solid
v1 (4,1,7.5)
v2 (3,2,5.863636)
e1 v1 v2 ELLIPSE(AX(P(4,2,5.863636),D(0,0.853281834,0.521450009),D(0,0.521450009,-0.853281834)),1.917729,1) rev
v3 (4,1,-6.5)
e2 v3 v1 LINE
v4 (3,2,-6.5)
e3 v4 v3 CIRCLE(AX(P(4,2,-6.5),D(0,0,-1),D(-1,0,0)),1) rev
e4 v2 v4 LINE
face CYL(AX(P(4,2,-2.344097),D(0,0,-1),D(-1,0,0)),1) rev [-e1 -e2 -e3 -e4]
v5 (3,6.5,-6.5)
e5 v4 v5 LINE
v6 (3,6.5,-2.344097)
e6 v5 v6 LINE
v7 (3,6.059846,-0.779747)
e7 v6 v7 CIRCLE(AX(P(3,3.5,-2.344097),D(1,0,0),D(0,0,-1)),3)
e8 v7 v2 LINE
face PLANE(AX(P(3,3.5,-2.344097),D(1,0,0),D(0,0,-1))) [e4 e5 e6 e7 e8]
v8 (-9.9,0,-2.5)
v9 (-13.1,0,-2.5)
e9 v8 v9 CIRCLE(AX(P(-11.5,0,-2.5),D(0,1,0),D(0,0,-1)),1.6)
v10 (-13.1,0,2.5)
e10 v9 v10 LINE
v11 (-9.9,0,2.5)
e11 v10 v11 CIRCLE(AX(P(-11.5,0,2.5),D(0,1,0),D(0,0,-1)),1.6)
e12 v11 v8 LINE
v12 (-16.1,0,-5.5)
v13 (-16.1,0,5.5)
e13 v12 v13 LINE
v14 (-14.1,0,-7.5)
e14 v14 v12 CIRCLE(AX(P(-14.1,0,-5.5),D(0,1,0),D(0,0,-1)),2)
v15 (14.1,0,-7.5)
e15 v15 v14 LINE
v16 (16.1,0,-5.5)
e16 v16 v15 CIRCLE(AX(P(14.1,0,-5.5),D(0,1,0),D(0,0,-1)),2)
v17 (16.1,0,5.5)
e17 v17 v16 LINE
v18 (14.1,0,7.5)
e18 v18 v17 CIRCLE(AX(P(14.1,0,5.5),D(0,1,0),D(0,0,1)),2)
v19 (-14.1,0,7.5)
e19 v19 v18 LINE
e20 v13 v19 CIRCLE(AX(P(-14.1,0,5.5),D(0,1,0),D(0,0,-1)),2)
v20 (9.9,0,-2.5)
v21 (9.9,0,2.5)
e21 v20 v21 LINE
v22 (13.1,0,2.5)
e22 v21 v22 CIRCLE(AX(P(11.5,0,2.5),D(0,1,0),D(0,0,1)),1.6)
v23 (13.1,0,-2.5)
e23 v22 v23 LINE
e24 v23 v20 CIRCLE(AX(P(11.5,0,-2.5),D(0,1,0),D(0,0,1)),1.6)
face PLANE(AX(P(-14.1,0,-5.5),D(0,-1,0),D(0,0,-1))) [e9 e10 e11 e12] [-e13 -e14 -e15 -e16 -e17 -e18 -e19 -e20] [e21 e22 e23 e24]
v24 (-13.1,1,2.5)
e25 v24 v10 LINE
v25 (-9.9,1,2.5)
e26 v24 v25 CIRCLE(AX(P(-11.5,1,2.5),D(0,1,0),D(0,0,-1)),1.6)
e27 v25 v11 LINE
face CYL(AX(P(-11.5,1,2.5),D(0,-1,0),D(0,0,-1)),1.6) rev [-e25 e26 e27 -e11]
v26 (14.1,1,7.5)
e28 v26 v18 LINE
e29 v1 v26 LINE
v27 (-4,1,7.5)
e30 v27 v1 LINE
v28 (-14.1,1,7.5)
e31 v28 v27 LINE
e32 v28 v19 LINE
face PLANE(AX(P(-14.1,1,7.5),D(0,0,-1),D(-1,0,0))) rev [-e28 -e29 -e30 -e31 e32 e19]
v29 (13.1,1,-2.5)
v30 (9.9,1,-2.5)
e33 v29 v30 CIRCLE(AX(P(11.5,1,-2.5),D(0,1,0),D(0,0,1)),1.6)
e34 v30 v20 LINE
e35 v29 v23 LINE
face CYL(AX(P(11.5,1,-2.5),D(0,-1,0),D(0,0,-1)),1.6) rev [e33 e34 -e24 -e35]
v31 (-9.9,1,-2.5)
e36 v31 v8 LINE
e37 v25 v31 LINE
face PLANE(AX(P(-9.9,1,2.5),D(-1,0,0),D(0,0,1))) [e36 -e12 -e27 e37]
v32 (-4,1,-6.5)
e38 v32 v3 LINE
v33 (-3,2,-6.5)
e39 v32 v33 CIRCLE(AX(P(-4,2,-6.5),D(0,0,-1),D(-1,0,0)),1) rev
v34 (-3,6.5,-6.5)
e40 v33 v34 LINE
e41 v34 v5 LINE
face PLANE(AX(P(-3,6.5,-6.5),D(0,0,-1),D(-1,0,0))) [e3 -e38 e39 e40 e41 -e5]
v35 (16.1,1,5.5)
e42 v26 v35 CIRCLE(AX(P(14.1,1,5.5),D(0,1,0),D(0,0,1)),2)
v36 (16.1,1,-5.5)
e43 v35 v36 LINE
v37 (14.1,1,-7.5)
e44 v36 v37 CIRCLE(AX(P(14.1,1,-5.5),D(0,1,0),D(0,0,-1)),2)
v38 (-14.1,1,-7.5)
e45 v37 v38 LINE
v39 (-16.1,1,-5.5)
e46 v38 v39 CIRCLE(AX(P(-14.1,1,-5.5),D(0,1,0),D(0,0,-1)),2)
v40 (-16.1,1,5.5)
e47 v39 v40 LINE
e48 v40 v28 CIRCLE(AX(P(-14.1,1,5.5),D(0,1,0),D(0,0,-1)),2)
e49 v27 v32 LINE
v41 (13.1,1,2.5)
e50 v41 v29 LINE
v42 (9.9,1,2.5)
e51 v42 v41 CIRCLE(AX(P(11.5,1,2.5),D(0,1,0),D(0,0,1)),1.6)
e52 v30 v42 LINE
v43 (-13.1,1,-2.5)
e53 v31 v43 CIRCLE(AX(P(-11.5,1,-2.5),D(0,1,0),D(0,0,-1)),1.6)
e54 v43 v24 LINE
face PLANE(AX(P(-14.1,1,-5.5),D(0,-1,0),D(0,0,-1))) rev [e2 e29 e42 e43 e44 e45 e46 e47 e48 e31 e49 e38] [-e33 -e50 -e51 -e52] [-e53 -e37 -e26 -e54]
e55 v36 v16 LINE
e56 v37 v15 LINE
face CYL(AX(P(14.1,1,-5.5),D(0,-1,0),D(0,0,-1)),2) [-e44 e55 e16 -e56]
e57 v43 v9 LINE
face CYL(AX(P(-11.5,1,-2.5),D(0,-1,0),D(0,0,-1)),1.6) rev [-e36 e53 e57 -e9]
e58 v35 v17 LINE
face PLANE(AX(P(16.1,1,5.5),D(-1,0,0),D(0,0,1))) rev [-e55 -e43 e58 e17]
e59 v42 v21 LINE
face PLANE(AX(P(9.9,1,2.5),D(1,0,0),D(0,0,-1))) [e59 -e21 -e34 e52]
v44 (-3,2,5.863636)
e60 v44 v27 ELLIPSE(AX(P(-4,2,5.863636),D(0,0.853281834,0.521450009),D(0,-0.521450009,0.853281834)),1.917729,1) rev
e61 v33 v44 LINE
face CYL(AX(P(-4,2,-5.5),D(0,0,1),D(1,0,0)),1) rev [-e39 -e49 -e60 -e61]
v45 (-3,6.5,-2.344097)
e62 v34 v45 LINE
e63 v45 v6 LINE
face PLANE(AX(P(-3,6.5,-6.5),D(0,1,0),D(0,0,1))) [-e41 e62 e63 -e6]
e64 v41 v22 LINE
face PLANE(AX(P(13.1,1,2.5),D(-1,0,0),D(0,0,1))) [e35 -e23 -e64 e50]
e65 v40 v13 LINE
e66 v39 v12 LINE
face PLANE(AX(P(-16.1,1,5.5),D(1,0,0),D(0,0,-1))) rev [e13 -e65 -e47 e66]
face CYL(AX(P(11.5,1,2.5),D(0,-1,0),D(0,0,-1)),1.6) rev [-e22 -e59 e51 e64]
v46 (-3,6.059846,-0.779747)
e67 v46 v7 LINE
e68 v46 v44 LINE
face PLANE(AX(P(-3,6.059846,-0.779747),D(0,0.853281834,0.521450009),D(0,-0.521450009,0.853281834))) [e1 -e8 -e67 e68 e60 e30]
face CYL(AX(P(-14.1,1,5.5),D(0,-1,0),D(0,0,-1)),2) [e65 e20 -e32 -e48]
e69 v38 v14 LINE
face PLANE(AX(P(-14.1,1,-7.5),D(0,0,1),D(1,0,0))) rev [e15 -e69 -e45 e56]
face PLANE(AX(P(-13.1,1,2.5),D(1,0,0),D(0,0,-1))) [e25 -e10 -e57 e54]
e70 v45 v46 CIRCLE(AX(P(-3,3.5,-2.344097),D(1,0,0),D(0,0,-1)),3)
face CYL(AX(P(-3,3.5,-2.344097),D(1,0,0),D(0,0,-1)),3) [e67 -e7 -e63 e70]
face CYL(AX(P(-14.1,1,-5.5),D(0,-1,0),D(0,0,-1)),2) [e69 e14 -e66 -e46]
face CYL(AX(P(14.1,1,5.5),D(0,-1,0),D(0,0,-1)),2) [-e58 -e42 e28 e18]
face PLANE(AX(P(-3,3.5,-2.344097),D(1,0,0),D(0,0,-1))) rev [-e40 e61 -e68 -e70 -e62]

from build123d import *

# Parameters (mm, degrees)
BOSS_EXTRUDE1_DEPTH      = 1
BOSS_EXTRUDE2_DEPTH      = 3
BOSS_EXTRUDE2_DEPTH_BACK = 3
FILLET1_R                = 1


with BuildPart() as part:
    # Sketch1 → Boss-Extrude1 (new body)
    with BuildSketch(Plane(origin=(0, 0, 0), x_dir=(1, 0, 0), z_dir=(0, 1, 0))):
        with BuildLine():
            Line((-14.1, -7.5), (14.1, -7.5))
            ThreePointArc((14.1, -7.5), (15.514213562, -6.914213562), (16.1, -5.5))
            Line((16.1, -5.5), (16.1, 5.5))
            ThreePointArc((16.1, 5.5), (15.514213562, 6.914213562), (14.1, 7.5))
            Line((14.1, 7.5), (-14.1, 7.5))
            ThreePointArc((-14.1, 7.5), (-15.514213562, 6.914213562), (-16.1, 5.5))
            Line((-16.1, 5.5), (-16.1, -5.5))
            ThreePointArc((-16.1, -5.5), (-15.514213562, -6.914213562), (-14.1, -7.5))
        make_face()
        with BuildLine():
            Line((9.9, -2.5), (9.9, 2.5))
            ThreePointArc((9.9, 2.5), (11.5, 4.1), (13.1, 2.5))
            Line((13.1, 2.5), (13.1, -2.5))
            ThreePointArc((13.1, -2.5), (11.5, -4.1), (9.9, -2.5))
        make_face(mode=Mode.SUBTRACT)
        with BuildLine():
            Line((-9.9, -2.5), (-9.9, 2.5))
            ThreePointArc((-9.9, 2.5), (-11.5, 4.1), (-13.1, 2.5))
            Line((-13.1, 2.5), (-13.1, -2.5))
            ThreePointArc((-13.1, -2.5), (-11.5, -4.1), (-9.9, -2.5))
        make_face(mode=Mode.SUBTRACT)
    extrude(amount=BOSS_EXTRUDE1_DEPTH)

    # Sketch2 → Boss-Extrude2 (add, two sides: drawn at the far end of the back side and taken through both)
    with BuildSketch(Plane(origin=(0, 0, 0), x_dir=(0, 0, -1), z_dir=(1, 0, 0)).offset(-BOSS_EXTRUDE2_DEPTH_BACK)):
        with BuildLine():
            Line((6.5, 6.5), (6.5, 1))
            Line((6.5, 1), (-7.5, 1))
            Line((-7.5, 1), (0.779747183, 6.059845501))
            ThreePointArc((0.779747183, 6.059845501), (1.531550752, 6.387865691), (2.344097212, 6.5))
            Line((2.344097212, 6.5), (6.5, 6.5))
        make_face()
    extrude(amount=BOSS_EXTRUDE2_DEPTH + BOSS_EXTRUDE2_DEPTH_BACK)

    # Fillet1
    # the kernel refuses this fillet: 1 mm, written as the material it adds along each edge
    with BuildSketch(Plane(origin=(-3, 1, -6.5), x_dir=(-1, 0, 0), z_dir=(0, 0, 1))) as fillet1_piece_1_section:
        with BuildLine():
            CenterArc((FILLET1_R, -FILLET1_R), FILLET1_R, 90, 90)
            Line((0, -FILLET1_R), (0, 0))
            Line((0, 0), (FILLET1_R, 0))
        make_face()
    fillet1_piece_1 = extrude(amount=14, mode=Mode.PRIVATE)
    fillet1_piece_1 = split(fillet1_piece_1, bisect_by=Plane(origin=(-3.229666566, 4.255348718, 2.173065734), z_dir=(0, -0.8532818336519591, -0.5214500094539749)), keep=Keep.TOP, mode=Mode.PRIVATE)
    add(fillet1_piece_1)
    with BuildSketch(Plane(origin=(3, 1, -6.5), x_dir=(1, 0, 0), z_dir=(0, 0, 1))) as fillet1_piece_2_section:
        with BuildLine():
            CenterArc((FILLET1_R, FILLET1_R), FILLET1_R, 180, 90)
            Line((0, FILLET1_R), (0, 0))
            Line((0, 0), (FILLET1_R, 0))
        make_face()
    fillet1_piece_2 = extrude(amount=14, mode=Mode.PRIVATE)
    fillet1_piece_2 = split(fillet1_piece_2, bisect_by=Plane(origin=(3.229666566, 4.255348718, 2.173065734), z_dir=(0, -0.8532818336519591, -0.5214500094539749)), keep=Keep.TOP, mode=Mode.PRIVATE)
    add(fillet1_piece_2)


solid = part.part
